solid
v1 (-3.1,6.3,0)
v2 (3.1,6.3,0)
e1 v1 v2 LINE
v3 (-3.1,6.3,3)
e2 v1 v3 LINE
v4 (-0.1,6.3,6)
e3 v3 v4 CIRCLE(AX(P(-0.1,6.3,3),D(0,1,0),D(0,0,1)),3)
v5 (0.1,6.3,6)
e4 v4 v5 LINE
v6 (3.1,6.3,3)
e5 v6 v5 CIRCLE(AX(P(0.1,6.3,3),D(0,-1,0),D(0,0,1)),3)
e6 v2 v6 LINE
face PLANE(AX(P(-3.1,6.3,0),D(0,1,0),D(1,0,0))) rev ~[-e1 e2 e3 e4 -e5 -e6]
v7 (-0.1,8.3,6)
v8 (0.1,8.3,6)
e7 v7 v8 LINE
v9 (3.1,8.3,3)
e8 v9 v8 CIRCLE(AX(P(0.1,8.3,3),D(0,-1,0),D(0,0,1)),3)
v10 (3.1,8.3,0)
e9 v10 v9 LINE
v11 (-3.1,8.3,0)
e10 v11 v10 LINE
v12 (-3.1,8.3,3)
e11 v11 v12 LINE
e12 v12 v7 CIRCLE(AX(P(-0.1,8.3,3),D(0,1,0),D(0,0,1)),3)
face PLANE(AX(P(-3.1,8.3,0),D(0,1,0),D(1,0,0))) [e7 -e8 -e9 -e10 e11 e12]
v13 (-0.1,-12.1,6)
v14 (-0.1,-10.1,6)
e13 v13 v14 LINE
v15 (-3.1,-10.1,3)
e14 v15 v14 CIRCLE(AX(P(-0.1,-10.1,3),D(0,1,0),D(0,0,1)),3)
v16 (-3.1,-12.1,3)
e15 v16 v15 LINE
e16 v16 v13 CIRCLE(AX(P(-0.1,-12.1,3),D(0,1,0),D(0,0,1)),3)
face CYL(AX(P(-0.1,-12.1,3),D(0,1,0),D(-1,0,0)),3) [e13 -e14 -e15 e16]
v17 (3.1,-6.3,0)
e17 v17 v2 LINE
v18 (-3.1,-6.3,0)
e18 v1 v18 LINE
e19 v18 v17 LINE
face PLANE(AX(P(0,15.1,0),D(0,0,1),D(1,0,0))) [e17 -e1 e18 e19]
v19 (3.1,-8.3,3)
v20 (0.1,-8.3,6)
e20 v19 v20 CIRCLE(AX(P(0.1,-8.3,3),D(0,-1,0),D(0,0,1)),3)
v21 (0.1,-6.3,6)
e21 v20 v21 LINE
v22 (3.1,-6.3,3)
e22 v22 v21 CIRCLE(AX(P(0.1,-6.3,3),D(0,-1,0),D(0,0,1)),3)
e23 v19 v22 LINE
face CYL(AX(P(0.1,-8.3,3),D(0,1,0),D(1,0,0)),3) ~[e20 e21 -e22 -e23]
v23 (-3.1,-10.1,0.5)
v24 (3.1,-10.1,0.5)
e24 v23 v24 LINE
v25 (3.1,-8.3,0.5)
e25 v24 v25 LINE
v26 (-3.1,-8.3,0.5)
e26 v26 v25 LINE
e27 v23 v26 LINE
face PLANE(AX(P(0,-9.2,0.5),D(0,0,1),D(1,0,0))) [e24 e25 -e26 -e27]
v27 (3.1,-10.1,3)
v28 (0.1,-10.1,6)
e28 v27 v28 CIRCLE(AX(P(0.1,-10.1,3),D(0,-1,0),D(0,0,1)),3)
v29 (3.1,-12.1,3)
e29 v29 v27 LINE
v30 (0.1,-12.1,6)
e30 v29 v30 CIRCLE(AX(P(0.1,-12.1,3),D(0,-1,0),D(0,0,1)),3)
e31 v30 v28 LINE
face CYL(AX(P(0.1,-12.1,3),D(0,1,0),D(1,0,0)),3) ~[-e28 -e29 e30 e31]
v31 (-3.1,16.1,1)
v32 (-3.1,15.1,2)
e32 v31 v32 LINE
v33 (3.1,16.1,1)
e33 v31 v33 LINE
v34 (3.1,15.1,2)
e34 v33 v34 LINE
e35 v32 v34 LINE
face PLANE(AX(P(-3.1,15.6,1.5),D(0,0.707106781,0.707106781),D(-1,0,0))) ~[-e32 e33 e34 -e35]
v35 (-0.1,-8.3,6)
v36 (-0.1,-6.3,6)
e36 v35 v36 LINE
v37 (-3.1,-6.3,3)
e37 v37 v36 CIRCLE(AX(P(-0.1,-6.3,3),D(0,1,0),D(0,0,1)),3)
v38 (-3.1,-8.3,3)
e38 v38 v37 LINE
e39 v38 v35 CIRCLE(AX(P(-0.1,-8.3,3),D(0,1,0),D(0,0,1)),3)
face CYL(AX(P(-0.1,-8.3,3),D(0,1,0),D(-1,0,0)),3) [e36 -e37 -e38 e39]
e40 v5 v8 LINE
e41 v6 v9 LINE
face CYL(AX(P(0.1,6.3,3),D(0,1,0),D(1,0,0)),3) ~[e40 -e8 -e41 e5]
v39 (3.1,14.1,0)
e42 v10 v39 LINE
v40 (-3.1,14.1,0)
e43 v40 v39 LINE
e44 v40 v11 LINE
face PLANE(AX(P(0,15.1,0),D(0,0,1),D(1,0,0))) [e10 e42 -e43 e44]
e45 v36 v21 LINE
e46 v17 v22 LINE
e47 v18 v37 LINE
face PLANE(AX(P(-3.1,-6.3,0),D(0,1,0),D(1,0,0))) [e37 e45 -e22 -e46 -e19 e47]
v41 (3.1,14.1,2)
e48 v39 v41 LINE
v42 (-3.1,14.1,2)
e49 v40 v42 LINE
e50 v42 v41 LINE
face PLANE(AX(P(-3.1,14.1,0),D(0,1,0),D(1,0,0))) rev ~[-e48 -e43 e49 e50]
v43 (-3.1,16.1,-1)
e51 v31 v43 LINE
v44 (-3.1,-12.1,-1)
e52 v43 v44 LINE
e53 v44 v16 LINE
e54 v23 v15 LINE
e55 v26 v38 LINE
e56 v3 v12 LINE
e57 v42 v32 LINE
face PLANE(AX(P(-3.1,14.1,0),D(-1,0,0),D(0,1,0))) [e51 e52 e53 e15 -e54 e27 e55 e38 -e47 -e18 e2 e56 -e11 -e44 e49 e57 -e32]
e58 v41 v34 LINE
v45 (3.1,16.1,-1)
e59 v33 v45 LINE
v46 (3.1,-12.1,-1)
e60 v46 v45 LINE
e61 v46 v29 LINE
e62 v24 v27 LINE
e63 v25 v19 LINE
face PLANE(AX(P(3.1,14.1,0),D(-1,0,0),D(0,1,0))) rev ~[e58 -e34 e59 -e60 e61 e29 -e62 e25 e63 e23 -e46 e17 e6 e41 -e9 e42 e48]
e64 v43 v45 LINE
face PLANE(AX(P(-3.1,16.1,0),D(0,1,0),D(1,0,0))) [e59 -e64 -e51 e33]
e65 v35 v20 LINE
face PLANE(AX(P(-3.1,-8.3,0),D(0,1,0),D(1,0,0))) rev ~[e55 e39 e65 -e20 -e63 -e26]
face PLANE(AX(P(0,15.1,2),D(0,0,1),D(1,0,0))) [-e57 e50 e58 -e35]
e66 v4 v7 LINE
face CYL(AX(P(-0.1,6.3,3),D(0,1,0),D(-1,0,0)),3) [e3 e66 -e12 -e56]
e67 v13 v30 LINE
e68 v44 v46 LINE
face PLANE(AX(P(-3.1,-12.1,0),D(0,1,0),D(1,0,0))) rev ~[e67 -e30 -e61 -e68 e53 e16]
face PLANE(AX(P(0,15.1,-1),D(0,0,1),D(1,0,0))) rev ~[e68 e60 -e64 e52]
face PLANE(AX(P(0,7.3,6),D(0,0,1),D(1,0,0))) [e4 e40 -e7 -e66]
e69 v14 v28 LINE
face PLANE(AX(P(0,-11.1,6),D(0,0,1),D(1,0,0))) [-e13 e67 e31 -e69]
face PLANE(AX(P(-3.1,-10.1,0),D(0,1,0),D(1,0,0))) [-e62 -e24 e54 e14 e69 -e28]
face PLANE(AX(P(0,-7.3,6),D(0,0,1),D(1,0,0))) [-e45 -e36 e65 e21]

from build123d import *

# Parameters (mm, degrees)
F0_W     = 6.2
F0_H     = 2
F0_H_2   = 12.6
F0_H_3   = 1.8
F0_H_4   = 5.8
F1_DEPTH = 1
F2_DEPTH = 6
F3_R     = 3
F4_DEPTH = 0.5
F5_DEPTH = 2
F6_SIZE  = 1


with BuildPart() as f1:
    # F0 (on Top) → F1 (new body)
    with BuildSketch(Plane.XY):
        with Locations((0, 15.1)):
            Rectangle(F0_W, F0_H)
        with Locations((0, -11.1)):
            Rectangle(F0_W, F0_H)
        Rectangle(F0_W, F0_H_2)
        with Locations((0, -7.3)):
            Rectangle(F0_W, F0_H)
        with Locations((0, -9.2)):
            Rectangle(F0_W, F0_H_3)
        with Locations((0, 7.3)):
            Rectangle(F0_W, F0_H)
        with Locations((0, 11.2)):
            Rectangle(F0_W, F0_H_4)
    extrude(amount=-F1_DEPTH)

    # F0 (on Top) → F2 (join)
    with BuildSketch(Plane.XY):
        with Locations((0, 7.3)):
            Rectangle(F0_W, F0_H)
        with Locations((0, -7.3)):
            Rectangle(F0_W, F0_H)
        with Locations((0, -11.1)):
            Rectangle(F0_W, F0_H)
    extrude(amount=F2_DEPTH)

    # F3
    f3_edges = [f1.edges().sort_by_distance(p)[0] for p in [
        (-3.1, 7.3, 6),
        (-3.1, -7.3, 6),
        (-3.1, -11.1, 6),
        (3.1, 7.3, 6),
        (3.1, -7.3, 6),
        (3.1, -11.1, 6),
    ]]
    fillet(f3_edges, radius=F3_R)

    # F0 (on Top) → F4 (join)
    with BuildSketch(Plane.XY):
        with Locations((0, -9.2)):
            Rectangle(F0_W, F0_H_3)
    extrude(amount=F4_DEPTH)

    # F0 (on Top) → F5 (join)
    with BuildSketch(Plane.XY):
        with Locations((0, 15.1)):
            Rectangle(F0_W, F0_H)
    extrude(amount=F5_DEPTH)

    # F6
    f6_edges = [f1.edges().sort_by_distance(p)[0] for p in [
        (0, 16.1, 2),
    ]]
    chamfer(f6_edges, length=F6_SIZE)


solid = f1.part
